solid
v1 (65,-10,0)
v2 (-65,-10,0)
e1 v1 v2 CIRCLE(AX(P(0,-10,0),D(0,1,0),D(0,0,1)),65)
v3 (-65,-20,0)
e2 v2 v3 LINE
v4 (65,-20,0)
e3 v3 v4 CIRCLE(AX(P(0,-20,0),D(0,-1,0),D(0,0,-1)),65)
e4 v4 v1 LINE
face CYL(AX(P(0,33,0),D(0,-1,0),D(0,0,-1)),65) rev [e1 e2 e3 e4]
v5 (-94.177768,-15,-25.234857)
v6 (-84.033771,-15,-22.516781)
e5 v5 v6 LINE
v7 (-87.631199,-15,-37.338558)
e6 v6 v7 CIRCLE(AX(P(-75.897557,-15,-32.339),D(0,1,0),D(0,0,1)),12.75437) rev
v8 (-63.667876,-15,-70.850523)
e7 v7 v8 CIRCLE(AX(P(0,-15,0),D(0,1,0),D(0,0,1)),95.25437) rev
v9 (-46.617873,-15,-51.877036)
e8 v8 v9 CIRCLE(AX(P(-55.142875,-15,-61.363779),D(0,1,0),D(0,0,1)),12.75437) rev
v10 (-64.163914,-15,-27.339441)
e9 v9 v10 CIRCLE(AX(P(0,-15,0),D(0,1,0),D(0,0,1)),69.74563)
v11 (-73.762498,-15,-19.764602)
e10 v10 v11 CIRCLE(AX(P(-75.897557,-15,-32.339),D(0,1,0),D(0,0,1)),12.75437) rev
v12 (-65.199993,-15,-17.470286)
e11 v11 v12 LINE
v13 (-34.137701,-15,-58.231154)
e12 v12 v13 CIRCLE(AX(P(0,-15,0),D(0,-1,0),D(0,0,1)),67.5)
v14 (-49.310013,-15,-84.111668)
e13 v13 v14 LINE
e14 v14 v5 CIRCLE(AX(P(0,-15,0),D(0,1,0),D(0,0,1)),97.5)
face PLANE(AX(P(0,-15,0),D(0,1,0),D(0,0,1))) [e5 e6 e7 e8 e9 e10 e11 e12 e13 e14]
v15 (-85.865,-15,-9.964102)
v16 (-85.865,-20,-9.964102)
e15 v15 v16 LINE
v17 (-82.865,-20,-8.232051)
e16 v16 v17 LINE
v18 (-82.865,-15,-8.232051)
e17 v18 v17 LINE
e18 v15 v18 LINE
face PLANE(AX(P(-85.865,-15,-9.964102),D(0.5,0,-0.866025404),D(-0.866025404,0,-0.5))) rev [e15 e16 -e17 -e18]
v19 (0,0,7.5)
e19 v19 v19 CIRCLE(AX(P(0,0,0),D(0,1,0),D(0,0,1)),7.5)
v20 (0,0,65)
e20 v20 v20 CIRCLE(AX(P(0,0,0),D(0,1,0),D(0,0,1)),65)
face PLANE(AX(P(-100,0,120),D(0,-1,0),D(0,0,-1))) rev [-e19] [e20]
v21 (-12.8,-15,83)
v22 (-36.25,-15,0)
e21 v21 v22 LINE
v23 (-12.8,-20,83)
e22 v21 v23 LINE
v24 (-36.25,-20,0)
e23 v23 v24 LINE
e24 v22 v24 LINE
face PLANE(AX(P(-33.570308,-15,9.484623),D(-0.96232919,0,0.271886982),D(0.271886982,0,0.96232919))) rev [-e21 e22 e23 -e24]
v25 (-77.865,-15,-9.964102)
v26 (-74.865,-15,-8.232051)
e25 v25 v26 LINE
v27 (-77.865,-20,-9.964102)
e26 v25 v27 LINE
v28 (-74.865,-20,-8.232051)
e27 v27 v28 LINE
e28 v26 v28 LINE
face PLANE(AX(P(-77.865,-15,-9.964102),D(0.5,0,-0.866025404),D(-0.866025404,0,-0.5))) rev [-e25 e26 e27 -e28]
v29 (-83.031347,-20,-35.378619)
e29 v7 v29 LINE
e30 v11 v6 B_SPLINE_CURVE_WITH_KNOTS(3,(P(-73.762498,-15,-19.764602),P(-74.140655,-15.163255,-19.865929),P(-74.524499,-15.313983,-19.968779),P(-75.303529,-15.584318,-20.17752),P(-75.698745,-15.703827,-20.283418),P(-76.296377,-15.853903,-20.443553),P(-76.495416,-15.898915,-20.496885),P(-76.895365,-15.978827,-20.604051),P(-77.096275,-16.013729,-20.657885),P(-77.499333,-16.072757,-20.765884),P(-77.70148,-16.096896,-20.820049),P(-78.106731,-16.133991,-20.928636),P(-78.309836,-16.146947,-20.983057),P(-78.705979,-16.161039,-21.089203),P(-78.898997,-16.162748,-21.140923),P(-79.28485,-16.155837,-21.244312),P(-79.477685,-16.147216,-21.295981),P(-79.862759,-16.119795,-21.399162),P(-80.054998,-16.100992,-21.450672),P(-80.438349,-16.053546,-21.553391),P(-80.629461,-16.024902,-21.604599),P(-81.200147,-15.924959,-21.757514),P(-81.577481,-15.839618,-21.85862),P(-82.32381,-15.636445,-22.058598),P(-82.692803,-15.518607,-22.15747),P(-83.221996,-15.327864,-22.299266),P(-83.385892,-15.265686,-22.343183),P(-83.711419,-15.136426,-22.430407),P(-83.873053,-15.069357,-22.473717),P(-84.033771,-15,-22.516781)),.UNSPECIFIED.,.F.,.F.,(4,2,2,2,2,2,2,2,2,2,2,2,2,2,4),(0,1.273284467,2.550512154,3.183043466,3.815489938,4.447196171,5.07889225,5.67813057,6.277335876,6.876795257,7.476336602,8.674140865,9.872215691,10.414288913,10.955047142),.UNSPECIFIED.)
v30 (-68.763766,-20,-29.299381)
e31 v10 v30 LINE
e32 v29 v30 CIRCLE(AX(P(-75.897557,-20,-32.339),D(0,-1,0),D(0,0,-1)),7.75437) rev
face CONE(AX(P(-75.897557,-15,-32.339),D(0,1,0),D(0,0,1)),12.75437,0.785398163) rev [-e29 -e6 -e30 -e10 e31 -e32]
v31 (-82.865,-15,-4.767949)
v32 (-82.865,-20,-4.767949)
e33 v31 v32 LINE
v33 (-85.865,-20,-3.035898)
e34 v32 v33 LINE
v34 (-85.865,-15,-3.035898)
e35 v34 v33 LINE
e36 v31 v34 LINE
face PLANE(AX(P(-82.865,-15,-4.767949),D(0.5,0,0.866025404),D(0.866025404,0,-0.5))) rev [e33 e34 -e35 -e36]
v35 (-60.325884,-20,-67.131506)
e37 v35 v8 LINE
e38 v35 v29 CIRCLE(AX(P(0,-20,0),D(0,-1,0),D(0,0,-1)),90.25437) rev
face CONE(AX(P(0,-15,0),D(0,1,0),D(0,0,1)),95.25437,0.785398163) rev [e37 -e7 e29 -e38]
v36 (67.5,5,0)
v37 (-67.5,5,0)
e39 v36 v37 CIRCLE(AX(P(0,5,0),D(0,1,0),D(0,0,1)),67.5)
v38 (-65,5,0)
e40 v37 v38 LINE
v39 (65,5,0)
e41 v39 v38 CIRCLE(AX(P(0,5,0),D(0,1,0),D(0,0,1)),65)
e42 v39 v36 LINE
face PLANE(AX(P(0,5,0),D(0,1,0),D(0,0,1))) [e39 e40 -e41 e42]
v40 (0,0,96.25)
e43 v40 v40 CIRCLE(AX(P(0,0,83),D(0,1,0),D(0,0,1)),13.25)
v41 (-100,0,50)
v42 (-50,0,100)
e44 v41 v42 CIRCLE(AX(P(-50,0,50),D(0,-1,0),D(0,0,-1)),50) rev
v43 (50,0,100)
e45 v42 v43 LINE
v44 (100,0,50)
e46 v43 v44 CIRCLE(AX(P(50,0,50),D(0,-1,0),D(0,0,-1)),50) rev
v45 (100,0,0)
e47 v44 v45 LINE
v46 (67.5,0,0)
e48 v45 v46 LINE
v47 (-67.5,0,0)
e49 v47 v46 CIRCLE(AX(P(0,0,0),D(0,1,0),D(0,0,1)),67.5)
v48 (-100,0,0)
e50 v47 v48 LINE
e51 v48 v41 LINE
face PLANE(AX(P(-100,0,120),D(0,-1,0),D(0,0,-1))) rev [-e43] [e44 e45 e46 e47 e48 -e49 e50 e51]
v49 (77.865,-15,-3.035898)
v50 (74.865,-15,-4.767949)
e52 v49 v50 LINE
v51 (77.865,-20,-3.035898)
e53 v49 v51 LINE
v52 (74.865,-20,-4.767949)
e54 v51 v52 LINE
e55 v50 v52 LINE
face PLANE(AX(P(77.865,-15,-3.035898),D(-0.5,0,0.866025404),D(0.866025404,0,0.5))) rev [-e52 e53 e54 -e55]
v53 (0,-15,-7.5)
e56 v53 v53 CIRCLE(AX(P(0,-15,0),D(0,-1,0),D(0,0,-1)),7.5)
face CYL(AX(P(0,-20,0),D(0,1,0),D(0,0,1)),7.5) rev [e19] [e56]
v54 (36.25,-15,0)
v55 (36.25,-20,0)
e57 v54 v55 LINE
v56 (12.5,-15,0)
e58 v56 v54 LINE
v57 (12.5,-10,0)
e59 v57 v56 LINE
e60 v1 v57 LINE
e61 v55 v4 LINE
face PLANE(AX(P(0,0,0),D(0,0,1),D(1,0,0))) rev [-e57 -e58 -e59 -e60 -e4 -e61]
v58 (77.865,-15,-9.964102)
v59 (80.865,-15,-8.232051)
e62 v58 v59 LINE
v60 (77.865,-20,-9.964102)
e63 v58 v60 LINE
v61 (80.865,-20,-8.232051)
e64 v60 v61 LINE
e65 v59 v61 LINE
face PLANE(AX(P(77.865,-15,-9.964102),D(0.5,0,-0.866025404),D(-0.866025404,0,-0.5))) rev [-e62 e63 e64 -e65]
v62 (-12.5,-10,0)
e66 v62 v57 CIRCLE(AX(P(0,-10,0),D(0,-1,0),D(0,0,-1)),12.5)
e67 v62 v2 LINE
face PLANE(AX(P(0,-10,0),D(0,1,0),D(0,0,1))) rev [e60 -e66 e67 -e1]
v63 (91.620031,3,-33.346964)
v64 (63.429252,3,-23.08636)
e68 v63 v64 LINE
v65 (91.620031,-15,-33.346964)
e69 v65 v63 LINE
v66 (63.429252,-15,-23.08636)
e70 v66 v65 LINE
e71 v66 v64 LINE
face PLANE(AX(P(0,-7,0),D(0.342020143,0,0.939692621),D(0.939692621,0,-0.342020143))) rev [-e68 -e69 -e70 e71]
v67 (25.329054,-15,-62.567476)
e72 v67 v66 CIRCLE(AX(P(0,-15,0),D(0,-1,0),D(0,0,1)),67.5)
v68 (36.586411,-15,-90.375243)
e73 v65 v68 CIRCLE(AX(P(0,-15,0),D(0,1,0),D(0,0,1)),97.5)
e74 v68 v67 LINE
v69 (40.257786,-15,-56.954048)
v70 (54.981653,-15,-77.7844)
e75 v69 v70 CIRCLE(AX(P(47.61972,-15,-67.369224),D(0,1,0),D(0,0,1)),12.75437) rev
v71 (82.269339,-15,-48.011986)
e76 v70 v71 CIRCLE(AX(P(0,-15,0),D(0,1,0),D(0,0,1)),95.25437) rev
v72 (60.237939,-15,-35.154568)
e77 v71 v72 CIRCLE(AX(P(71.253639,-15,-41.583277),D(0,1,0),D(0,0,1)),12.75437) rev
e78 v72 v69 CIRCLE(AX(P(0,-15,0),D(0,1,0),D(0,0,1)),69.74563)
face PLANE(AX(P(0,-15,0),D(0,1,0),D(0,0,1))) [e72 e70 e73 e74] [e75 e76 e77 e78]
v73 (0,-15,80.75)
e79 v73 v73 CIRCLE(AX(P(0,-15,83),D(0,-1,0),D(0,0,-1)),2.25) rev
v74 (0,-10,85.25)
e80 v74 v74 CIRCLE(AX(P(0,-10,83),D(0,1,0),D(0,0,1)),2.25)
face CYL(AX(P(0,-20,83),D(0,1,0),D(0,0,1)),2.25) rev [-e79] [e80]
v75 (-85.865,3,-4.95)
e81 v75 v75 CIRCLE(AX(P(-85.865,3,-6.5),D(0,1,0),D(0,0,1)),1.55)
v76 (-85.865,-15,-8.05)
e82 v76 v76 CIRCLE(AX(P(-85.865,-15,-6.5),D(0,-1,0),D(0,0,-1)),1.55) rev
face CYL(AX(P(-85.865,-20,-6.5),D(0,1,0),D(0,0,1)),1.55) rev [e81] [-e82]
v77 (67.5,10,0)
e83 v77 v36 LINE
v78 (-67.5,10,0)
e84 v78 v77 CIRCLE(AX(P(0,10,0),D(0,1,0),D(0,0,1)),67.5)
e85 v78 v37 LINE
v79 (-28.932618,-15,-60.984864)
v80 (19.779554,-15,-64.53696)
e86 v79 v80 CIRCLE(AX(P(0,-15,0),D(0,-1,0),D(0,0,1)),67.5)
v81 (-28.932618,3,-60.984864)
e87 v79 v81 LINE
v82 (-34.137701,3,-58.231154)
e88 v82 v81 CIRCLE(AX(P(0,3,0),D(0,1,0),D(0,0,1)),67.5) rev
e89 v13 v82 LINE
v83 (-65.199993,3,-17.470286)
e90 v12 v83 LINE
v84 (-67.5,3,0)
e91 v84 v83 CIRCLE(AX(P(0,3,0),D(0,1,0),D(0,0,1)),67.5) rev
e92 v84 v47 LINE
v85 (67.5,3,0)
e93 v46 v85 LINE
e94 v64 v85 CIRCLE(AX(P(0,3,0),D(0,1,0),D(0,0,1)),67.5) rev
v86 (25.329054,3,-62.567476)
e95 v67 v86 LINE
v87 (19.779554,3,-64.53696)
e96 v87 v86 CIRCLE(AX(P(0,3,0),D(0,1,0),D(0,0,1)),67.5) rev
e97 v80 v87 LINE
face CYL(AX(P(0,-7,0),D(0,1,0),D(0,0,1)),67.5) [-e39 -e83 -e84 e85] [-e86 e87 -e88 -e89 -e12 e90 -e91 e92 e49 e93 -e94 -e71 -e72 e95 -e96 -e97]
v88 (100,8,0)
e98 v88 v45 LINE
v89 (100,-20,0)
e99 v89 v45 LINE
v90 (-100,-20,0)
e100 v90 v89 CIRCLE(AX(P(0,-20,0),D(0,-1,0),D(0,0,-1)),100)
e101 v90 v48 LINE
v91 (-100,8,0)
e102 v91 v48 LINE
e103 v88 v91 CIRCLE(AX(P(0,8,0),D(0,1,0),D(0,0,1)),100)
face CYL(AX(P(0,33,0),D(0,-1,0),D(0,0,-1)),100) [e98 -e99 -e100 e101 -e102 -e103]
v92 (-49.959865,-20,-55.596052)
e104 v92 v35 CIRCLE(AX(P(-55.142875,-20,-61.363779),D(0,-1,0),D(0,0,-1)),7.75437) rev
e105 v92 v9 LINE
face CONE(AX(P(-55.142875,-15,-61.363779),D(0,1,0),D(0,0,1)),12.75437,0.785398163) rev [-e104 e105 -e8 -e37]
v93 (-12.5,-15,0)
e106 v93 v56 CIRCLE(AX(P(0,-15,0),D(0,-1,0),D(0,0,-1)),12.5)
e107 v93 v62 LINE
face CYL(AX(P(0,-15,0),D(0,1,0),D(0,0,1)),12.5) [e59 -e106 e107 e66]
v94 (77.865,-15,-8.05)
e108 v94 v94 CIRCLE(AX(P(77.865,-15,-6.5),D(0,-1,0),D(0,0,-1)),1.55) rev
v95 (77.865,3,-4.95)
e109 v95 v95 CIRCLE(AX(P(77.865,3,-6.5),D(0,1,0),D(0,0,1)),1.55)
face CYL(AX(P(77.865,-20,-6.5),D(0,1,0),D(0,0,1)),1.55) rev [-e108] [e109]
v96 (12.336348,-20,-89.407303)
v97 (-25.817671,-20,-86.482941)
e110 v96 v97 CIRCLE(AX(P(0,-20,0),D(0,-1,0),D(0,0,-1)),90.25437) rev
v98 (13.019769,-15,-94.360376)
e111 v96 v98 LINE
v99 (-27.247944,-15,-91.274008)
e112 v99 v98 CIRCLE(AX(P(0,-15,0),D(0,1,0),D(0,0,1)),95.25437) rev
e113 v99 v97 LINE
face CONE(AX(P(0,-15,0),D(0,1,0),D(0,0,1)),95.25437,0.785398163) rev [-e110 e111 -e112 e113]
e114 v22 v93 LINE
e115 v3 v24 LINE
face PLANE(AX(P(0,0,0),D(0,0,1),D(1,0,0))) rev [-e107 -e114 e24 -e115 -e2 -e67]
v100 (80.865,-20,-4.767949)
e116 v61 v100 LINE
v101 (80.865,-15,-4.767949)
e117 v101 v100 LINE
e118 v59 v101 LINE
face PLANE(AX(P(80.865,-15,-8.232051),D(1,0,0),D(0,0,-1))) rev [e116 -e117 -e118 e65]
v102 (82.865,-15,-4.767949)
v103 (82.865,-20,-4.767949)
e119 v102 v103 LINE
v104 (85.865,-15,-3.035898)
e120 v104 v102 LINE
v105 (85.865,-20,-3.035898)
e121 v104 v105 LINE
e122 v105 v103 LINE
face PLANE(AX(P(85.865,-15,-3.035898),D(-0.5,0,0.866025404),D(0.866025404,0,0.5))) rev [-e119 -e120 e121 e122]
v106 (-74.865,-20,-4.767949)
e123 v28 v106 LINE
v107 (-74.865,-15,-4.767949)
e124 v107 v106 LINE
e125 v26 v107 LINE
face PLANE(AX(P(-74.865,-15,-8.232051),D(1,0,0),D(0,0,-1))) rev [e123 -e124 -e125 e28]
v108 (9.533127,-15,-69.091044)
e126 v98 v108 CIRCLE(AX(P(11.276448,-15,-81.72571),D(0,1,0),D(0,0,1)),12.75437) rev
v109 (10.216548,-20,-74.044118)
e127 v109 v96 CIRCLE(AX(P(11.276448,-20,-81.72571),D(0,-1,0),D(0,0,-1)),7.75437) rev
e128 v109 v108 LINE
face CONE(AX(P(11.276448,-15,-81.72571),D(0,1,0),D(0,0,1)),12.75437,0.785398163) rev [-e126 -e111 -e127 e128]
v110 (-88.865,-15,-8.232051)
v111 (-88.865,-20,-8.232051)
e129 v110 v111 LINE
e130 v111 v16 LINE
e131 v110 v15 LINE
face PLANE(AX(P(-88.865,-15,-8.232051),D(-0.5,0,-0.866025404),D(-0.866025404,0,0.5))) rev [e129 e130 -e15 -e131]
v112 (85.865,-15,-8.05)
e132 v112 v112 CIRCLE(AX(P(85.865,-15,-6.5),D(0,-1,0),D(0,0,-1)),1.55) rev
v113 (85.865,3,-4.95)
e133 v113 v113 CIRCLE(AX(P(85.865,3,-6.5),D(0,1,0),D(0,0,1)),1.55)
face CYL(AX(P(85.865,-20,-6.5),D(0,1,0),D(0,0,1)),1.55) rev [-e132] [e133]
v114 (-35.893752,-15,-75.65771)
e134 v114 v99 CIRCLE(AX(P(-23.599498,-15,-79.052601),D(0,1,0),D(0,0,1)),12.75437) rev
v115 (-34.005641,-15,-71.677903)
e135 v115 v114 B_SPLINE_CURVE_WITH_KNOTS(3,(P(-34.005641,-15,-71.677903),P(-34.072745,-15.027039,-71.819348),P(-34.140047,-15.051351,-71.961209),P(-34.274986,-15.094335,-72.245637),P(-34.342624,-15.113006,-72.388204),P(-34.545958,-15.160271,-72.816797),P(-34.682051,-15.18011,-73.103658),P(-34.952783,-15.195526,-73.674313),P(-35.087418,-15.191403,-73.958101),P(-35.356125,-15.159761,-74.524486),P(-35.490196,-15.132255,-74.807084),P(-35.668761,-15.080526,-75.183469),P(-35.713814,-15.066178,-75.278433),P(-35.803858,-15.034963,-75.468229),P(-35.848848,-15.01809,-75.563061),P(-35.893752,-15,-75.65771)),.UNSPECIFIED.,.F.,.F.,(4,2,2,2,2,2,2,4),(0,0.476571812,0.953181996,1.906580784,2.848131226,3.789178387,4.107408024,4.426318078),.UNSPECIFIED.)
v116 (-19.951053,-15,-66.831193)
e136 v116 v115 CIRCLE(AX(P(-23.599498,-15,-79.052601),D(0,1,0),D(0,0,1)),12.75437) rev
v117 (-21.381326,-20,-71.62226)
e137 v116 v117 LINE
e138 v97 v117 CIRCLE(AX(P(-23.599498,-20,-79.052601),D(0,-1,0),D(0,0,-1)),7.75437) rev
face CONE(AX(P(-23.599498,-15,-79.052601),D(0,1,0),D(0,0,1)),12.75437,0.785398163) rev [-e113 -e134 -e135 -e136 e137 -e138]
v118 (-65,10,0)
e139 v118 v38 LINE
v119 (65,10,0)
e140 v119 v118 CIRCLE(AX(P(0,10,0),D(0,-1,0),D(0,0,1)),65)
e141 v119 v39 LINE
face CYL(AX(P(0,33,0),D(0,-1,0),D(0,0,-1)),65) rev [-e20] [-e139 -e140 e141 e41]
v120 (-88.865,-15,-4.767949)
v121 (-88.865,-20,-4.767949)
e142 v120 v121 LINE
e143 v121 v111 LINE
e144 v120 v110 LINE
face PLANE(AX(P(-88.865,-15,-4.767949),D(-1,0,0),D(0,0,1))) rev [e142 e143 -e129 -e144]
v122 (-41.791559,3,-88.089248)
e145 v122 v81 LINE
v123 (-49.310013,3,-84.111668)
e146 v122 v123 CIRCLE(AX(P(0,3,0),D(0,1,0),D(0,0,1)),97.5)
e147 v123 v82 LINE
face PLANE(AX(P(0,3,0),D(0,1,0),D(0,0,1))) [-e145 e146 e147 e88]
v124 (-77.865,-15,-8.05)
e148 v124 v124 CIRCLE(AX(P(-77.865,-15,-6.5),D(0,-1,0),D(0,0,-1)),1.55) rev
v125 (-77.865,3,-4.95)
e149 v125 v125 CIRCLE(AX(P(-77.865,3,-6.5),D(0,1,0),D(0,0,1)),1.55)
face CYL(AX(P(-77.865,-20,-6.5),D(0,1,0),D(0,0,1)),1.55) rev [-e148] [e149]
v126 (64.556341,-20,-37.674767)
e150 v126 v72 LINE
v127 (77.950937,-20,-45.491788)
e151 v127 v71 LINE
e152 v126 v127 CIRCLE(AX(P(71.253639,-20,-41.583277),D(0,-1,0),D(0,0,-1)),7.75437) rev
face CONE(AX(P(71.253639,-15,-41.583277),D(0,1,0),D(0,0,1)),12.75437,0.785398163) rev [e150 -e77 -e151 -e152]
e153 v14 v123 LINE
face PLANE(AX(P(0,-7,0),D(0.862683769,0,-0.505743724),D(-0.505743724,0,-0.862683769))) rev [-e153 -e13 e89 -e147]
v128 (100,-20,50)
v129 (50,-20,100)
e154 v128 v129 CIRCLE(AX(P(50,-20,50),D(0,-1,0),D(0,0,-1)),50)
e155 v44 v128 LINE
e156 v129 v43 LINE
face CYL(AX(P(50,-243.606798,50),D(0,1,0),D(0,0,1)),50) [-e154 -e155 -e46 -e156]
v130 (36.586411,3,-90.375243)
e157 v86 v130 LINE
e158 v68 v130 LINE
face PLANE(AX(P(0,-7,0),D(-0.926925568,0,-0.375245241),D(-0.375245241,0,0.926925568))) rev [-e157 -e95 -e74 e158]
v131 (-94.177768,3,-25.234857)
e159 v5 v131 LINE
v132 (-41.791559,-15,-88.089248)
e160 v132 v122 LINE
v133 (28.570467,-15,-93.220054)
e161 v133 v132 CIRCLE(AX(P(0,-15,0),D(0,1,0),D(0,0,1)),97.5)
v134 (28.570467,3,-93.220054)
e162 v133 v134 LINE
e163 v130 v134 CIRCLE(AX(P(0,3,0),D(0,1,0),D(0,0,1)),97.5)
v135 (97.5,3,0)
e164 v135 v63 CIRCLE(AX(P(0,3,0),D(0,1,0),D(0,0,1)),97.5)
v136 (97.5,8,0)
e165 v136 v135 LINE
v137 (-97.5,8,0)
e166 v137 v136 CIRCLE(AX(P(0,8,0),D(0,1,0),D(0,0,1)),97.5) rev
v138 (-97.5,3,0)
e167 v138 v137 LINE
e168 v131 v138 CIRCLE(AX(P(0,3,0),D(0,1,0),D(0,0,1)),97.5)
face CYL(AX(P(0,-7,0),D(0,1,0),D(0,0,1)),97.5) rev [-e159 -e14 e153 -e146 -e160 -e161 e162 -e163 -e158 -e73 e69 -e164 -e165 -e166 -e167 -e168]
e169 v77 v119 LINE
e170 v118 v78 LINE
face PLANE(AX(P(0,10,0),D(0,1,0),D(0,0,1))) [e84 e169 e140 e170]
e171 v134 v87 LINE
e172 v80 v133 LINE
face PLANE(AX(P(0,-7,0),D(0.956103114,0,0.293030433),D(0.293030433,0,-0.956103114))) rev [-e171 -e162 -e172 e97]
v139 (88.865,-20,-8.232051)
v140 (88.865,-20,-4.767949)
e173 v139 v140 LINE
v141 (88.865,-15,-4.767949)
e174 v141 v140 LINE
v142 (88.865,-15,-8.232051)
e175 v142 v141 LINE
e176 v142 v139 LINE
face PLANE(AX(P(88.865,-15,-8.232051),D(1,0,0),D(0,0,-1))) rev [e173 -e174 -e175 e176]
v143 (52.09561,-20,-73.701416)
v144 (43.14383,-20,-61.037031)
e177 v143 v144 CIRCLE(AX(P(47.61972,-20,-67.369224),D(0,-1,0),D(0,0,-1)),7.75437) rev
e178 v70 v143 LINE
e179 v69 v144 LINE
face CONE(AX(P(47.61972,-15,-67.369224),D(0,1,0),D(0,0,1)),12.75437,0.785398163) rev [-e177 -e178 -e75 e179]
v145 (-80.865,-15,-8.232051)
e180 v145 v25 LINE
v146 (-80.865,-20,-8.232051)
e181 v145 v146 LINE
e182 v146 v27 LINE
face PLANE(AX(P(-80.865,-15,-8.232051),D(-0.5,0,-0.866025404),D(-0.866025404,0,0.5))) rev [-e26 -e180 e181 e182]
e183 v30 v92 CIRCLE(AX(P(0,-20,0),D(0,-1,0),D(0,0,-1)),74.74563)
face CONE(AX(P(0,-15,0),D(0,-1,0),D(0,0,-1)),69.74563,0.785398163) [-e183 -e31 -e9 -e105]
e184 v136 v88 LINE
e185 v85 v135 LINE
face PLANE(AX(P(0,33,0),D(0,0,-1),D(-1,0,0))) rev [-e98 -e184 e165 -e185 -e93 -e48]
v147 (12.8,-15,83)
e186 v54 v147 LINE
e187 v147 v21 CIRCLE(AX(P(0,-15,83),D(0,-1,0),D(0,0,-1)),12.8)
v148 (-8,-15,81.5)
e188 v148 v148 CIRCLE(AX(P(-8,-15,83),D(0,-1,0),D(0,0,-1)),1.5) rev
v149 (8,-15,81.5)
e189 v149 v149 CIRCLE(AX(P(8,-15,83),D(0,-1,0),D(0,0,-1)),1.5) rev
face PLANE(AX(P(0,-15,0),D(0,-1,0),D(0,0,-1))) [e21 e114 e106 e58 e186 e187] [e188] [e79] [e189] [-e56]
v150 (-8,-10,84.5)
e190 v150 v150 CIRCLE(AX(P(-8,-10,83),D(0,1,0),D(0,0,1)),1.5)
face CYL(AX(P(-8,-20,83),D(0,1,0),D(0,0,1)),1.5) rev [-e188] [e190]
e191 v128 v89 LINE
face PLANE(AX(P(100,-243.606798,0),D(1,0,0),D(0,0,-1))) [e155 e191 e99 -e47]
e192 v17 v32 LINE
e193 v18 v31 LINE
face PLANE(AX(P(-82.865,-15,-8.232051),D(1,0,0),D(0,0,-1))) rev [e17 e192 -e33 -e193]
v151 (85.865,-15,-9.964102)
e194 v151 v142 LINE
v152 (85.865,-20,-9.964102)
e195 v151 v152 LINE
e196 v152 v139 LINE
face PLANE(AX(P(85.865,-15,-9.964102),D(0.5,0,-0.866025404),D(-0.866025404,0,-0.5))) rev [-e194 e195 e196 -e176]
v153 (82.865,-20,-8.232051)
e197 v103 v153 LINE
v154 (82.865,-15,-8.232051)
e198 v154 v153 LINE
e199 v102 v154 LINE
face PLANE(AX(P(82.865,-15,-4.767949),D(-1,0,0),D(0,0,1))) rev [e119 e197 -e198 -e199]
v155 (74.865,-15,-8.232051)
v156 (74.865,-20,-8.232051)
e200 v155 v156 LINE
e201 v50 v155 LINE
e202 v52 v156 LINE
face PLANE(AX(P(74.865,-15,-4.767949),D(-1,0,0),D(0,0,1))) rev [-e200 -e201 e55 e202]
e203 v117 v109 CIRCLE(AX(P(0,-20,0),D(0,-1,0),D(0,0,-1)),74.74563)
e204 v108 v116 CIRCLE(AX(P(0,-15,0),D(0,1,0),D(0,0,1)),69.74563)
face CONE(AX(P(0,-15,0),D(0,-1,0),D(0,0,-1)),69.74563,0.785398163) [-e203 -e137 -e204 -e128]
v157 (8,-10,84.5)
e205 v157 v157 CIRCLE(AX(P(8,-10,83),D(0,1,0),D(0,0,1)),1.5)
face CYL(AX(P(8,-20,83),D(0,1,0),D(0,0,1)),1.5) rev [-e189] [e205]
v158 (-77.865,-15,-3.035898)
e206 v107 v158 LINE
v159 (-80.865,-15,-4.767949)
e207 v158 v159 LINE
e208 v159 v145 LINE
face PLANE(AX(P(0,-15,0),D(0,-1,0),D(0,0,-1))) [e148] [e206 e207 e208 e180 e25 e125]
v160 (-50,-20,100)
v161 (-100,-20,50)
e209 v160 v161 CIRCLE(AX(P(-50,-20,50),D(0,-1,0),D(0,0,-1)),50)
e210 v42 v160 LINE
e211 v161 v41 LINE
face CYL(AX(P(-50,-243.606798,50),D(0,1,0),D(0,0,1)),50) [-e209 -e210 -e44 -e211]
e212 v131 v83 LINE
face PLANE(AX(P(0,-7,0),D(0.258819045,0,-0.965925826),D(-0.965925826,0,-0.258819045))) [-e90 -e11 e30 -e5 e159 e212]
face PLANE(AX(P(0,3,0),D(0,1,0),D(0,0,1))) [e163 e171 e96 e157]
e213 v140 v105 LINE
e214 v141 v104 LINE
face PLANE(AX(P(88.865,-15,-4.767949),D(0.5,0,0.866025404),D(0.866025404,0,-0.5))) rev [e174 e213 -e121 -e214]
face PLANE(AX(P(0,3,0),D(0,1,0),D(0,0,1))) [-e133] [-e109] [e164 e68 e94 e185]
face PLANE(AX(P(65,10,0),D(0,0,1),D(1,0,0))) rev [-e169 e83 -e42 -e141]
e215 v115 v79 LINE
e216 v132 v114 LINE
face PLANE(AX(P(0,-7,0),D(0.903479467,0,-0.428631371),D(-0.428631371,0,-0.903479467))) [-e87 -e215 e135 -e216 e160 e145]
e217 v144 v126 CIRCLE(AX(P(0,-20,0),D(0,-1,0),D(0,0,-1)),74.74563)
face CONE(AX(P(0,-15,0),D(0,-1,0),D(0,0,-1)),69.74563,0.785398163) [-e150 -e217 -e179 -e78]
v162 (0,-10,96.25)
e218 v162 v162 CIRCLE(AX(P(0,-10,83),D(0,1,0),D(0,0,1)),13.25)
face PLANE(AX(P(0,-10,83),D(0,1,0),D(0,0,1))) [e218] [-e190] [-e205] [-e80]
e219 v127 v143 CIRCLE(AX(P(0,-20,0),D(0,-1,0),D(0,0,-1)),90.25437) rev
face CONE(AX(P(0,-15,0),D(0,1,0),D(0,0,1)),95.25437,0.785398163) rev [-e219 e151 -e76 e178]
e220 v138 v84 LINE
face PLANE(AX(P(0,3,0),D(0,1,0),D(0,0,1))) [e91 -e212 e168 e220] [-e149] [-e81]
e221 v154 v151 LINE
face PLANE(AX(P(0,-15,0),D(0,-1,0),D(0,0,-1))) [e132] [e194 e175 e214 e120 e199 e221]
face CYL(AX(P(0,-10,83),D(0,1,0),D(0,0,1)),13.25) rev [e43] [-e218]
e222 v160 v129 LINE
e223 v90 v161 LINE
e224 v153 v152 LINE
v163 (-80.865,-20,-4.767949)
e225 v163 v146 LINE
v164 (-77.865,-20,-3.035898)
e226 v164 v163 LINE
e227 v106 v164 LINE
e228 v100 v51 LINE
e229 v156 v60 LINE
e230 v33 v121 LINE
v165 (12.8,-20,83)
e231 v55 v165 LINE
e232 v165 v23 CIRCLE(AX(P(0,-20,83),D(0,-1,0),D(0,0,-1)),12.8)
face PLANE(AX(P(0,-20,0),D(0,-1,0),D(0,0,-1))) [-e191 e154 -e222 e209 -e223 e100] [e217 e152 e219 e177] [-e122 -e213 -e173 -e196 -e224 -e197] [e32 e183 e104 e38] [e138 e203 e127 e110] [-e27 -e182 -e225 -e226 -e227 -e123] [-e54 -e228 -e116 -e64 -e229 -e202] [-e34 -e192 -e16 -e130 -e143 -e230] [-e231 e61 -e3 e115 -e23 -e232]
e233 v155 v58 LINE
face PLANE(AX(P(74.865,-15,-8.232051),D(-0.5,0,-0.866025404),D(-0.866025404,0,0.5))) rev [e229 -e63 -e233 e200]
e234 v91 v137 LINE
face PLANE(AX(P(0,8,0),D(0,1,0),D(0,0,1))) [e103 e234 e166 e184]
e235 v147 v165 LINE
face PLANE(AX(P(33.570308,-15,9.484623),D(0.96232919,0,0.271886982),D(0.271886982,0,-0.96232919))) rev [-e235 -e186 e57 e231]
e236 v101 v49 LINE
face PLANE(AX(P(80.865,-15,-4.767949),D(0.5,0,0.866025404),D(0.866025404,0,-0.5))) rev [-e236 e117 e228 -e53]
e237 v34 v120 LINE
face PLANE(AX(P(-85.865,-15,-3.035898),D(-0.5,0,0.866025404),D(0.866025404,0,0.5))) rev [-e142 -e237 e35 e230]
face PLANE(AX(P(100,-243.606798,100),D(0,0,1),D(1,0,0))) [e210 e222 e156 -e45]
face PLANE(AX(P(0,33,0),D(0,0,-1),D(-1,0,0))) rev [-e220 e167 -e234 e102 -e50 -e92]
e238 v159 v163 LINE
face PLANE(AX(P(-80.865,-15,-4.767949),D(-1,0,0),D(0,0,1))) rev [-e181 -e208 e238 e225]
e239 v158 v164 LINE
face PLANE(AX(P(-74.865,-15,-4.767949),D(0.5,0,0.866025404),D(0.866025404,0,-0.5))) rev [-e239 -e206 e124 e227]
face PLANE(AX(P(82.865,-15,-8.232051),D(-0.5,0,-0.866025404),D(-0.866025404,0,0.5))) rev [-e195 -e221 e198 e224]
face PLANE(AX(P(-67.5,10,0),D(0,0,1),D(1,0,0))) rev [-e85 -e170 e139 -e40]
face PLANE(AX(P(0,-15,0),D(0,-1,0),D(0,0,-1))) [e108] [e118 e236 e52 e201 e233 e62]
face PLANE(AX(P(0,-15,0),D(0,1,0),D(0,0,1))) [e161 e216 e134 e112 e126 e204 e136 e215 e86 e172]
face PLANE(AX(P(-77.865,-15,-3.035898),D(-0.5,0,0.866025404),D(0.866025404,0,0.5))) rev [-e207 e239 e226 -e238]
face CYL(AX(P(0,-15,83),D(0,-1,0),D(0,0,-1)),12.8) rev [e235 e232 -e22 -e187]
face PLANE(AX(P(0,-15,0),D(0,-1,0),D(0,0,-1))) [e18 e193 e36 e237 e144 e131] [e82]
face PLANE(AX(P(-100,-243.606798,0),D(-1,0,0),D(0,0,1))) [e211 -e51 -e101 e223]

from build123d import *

# Parameters (mm, degrees)
BOSS_EXTRUDE1_DEPTH        = 33
CUT_EXTRUDE1_DEPTH         = 40
CUT_EXTRUDE2_DEPTH         = 40
CUT_EXTRUDE3_DEPTH         = 40
BOSS_EXTRUDE3_START        = 30
BOSS_EXTRUDE3_DEPTH        = 30
SKETCH26_W                 = 200
SKETCH26_H                 = 30
BOSS_EXTRUDE6_DEPTH        = 120
SKETCH28_R                 = 156.204993518
CUT_EXTRUDE4_DEPTH         = 40
CUT_EXTRUDE5_START         = -25
SKETCH29_R                 = 100
CUT_EXTRUDE5_DEPTH         = 25
CUT_EXTRUDE8_DEPTH         = 20
SKETCH31_R                 = 156.204993518
SKETCH31_R_2               = 100
CUT_EXTRUDE9_DEPTH         = 20
CUT_EXTRUDE10_DEPTH        = 20
BOSS_EXTRUDE8_START        = -10
SKETCH33_R                 = 65
BOSS_EXTRUDE8_DEPTH        = 10
CUT_EXTRUDE11_DEPTH        = 15
CHAMFER2_SIZE              = 7
SKETCH35_R                 = 7.5
CUT_EXTRUDE12_DEPTH        = 143.828568571
SKETCH36_R                 = 12.5
SKETCH36_R_2               = 7.5
BOSS_EXTRUDE9_DEPTH        = 5
SKETCH37_W                 = 200
SKETCH37_H                 = 100
BOSS_EXTRUDE10_DEPTH       = 20
SKETCH38_R                 = 7.5
CUT_EXTRUDE13_DEPTH        = 15
FILLET1_R                  = 50
SKETCH40_R                 = 97.5
CUT_EXTRUDE14_DEPTH        = 5
BOSS_EXTRUDE11_OUTLINE_R   = 67.5
BOSS_EXTRUDE11_OUTLINE_R_2 = 65
BOSS_EXTRUDE11_DEPTH       = 5
BOSS_EXTRUDE12_DEPTH       = 10
CUT_EXTRUDE15_DEPTH        = 143.828568571
CUT_EXTRUDE15_DEPTH_BACK   = 143.828568571
SKETCH48_R                 = 1.55
SKETCH50_R                 = 13.25
CUT_EXTRUDE16_DEPTH        = 10
CUT_EXTRUDE17_DEPTH        = 143.828568571
CUT_EXTRUDE17_DEPTH_BACK   = 143.828568571
SKETCH51_R                 = 2.25
SKETCH51_R_2               = 1.5
SKETCH52_R                 = 12.8
CUT_EXTRUDE18_DEPTH        = 5
CUT_EXTRUDE19_DEPTH        = 5
CUT_EXTRUDE20_DEPTH        = 5


# Read off the part's stored shape, not the designer's step: Boss-Extrude11
with BuildPart() as part:
    # Sketch1 → Boss-Extrude1 (new body)
    with BuildSketch(Plane(origin=(0, 0, 0), x_dir=(1, 0, 0), z_dir=(0, 1, 0))):
        with BuildLine():
            ThreePointArc((100, 0), (0, 100), (-100, 0))
            Line((-100, 0), (-65, 0))
            ThreePointArc((-65, 0), (0, 65), (65, 0))
            Line((65, 0), (100, 0))
        make_face()
    extrude(amount=BOSS_EXTRUDE1_DEPTH)

    # Sketch3 → Cut-Extrude1 (cut)
    with BuildSketch(Plane(origin=(0, 33, 0), x_dir=(1, 0, 0), z_dir=(0, 1, 0))):
        with BuildLine():
            ThreePointArc((91.620030527, 33.346963974), (70.158955681, 67.705028895), (36.586411012, 90.3752429))
            Line((36.586411012, 90.3752429), (25.329053777, 62.567475854))
            ThreePointArc((25.329053777, 62.567475854), (48.571584702, 46.872712312), (63.429251903, 23.086359674))
            Line((63.429251903, 23.086359674), (91.620030527, 33.346963974))
        make_face()
    extrude(amount=-CUT_EXTRUDE1_DEPTH, mode=Mode.SUBTRACT)

    # Sketch4 → Cut-Extrude2 (cut)
    with BuildSketch(Plane(origin=(0, 33, 0), x_dir=(1, 0, 0), z_dir=(0, 1, 0))):
        with BuildLine():
            Line((-41.791558708, 88.089248043), (-28.932617567, 60.98486403))
            ThreePointArc((-28.932617567, 60.98486403), (-4.909072096, 67.321252299), (19.779554251, 64.536960214))
            Line((19.779554251, 64.536960214), (28.570467251, 93.220053642))
            ThreePointArc((28.570467251, 93.220053642), (-7.090881917, 97.241808877), (-41.791558708, 88.089248043))
        make_face()
    extrude(amount=-CUT_EXTRUDE2_DEPTH, mode=Mode.SUBTRACT)

    # Sketch5 → Cut-Extrude3 (cut)
    with BuildSketch(Plane(origin=(0, 33, 0), x_dir=(1, 0, 0), z_dir=(0, 1, 0))):
        with BuildLine():
            ThreePointArc((-65.199993275, 17.470285544), (-53.687582374, 40.913243562), (-34.137701343, 58.231154436))
            Line((-34.137701343, 58.231154436), (-49.310013051, 84.111667519))
            ThreePointArc((-49.310013051, 84.111667519), (-77.548730096, 59.096907368), (-94.177768063, 25.234856897))
            Line((-94.177768063, 25.234856897), (-65.199993275, 17.470285544))
        make_face()
    extrude(amount=-CUT_EXTRUDE3_DEPTH, mode=Mode.SUBTRACT)

    # Sketch8 → Boss-Extrude3 (add)
    with BuildSketch(Plane.XZ.offset(BOSS_EXTRUDE3_START)):
        with BuildLine():
            Line((-65, 0), (-100, 0))
            ThreePointArc((-100, 0), (0, -100), (100, 0))
            Line((100, 0), (65, 0))
            ThreePointArc((65, 0), (0, -65), (-65, 0))
        make_face()
    extrude(amount=-BOSS_EXTRUDE3_DEPTH)

    # Sketch26 → Boss-Extrude6 (add)
    with BuildSketch(Plane.XY):
        with Locations((0, -15)):
            Rectangle(SKETCH26_W, SKETCH26_H)
    extrude(amount=BOSS_EXTRUDE6_DEPTH)

    # Sketch28 → Cut-Extrude4 (cut)
    with BuildSketch(Plane.XZ.offset(60)):
        Circle(SKETCH28_R)
    extrude(amount=-CUT_EXTRUDE4_DEPTH, mode=Mode.SUBTRACT)

    # Sketch29 → Cut-Extrude5 (cut)
    with BuildSketch(Plane(origin=(0, 33, 0), x_dir=(1, 0, 0), z_dir=(0, 1, 0)).offset(CUT_EXTRUDE5_START)):
        Circle(SKETCH29_R)
    extrude(amount=CUT_EXTRUDE5_DEPTH, mode=Mode.SUBTRACT)

    # Sketch30 → Cut-Extrude8 (cut)
    with BuildSketch(Plane.XZ.offset(20)):
        with BuildLine():
            ThreePointArc((-99.143723606, 13.058409912), (6.543227008, 99.785701282), (100, 0))
            Line((100, 0), (100, 120))
            Line((100, 120), (-100, 120))
            Line((-100, 120), (-99.143723606, 13.058409912))
        make_face()
    extrude(amount=-CUT_EXTRUDE8_DEPTH, mode=Mode.SUBTRACT)

    # Sketch31 → Cut-Extrude9 (cut)
    with BuildSketch(Plane(origin=(0, -20, 0), x_dir=(-1, 0, 0), z_dir=(0, -1, 0))):
        Circle(SKETCH31_R)
        with Locations(Location((0, 0, 0), (0, 0, 90))):
            Circle(SKETCH31_R_2, mode=Mode.SUBTRACT)
    extrude(amount=-CUT_EXTRUDE9_DEPTH, mode=Mode.SUBTRACT)

    # Sketch32 → Cut-Extrude10 (cut)
    with BuildSketch(Plane(origin=(0, 0, 0), x_dir=(1, 0, 0), z_dir=(0, 1, 0))):
        with BuildLine():
            ThreePointArc((66.28370188, 38.682846188), (74.154069941, 36.613340263), (76.223575866, 44.483708324))
            ThreePointArc((76.223575866, 44.483708324), (65.061093766, 59.631266145), (50.941192214, 72.068222955))
            ThreePointArc((50.941192214, 72.068222955), (42.920720385, 70.690696246), (44.298247095, 62.670224417))
            ThreePointArc((44.298247095, 62.670224417), (56.576854263, 51.855098937), (66.28370188, 38.682846188))
        make_face()
        with BuildLine():
            ThreePointArc((10.489916637, 76.025346912), (16.976811553, 80.939178669), (12.062979796, 87.426073585))
            ThreePointArc((12.062979796, 87.426073585), (-6.744582107, 87.996275127), (-25.24556204, 84.566514776))
            ThreePointArc((-25.24556204, 84.566514776), (-29.113412559, 77.406537084), (-21.953434866, 73.538686565))
            ThreePointArc((-21.953434866, 73.538686565), (-5.865060312, 76.521191781), (10.489916637, 76.025346912))
        make_face()
        with BuildLine():
            ThreePointArc((-51.296662451, 57.083659181), (-50.862754743, 65.209991213), (-58.989086775, 65.643898921))
            ThreePointArc((-58.989086775, 65.643898921), (-71.788973817, 51.333975711), (-81.19140666, 34.594642774))
            ThreePointArc((-81.19140666, 34.594642774), (-78.153199938, 27.045149539), (-70.603706703, 30.083356261))
            ThreePointArc((-70.603706703, 30.083356261), (-62.427390538, 44.639809976), (-51.296662451, 57.083659181))
        make_face()
    extrude(amount=-CUT_EXTRUDE10_DEPTH, mode=Mode.SUBTRACT)

    # Sketch33 → Boss-Extrude8 (add)
    with BuildSketch(Plane(origin=(0, 0, 0), x_dir=(1, 0, 0), z_dir=(0, 1, 0)).offset(BOSS_EXTRUDE8_START)):
        Circle(SKETCH33_R)
    extrude(amount=BOSS_EXTRUDE8_DEPTH)

    # Sketch34 → Cut-Extrude11 (cut)
    with BuildSketch(Plane(origin=(0, 0, 0), x_dir=(1, 0, 0), z_dir=(0, 1, 0))):
        with BuildLine():
            Line((63.429251903, 23.086359674), (91.620030527, 33.346963974))
            ThreePointArc((91.620030527, 33.346963974), (70.158955681, 67.705028895), (36.586411012, 90.3752429))
            Line((36.586411012, 90.3752429), (25.329053777, 62.567475854))
            ThreePointArc((25.329053777, 62.567475854), (48.571584702, 46.872712312), (63.429251903, 23.086359674))
        make_face()
        with BuildLine():
            Line((19.779554251, 64.536960214), (28.570467251, 93.220053642))
            ThreePointArc((28.570467251, 93.220053642), (-7.090881917, 97.241808877), (-41.791558708, 88.089248043))
            Line((-41.791558708, 88.089248043), (-28.932617567, 60.98486403))
            ThreePointArc((-28.932617567, 60.98486403), (-4.909072096, 67.321252299), (19.779554251, 64.536960214))
        make_face()
        with BuildLine():
            Line((-34.137701343, 58.231154436), (-49.310013051, 84.111667519))
            ThreePointArc((-49.310013051, 84.111667519), (-77.548730096, 59.096907368), (-94.177768063, 25.234856897))
            Line((-94.177768063, 25.234856897), (-65.199993275, 17.470285544))
            ThreePointArc((-65.199993275, 17.470285544), (-53.687582374, 40.913243562), (-34.137701343, 58.231154436))
        make_face()
    extrude(amount=-CUT_EXTRUDE11_DEPTH, mode=Mode.SUBTRACT)

    # Chamfer2
    # the kernel refuses this chamfer: 7 mm, written as the material it takes off along each edge
    with BuildSketch(Plane(origin=(0, -15, 0), x_dir=(-0.6683984801552533, 0, -0.7438033824379582), z_dir=(0.7438033824379582, 0, -0.6683984801552533))) as chamfer2_piece_1:
        Polygon((88.25437, -CHAMFER2_SIZE), (88.25437 + CHAMFER2_SIZE, 0), (88.25437, 0), align=None)
    revolve(axis=Axis((0, -15, 0), (0, 1, 0)), revolution_arc=24.978173914, mode=Mode.SUBTRACT)
    with BuildSketch(Plane(origin=(-55.142874613, -15, -61.363779051), x_dir=(0.668398480155252, 0, 0.7438033824379592), z_dir=(-0.7438033824379592, 0, 0.668398480155252))) as chamfer2_piece_2:
        Polygon((5.75437, -CHAMFER2_SIZE), (5.75437 + CHAMFER2_SIZE, 0), (5.75437, 0), align=None)
    revolve(axis=Axis((-55.142874613, -15, -61.363779051), (0, 1, 0)), revolution_arc=180, mode=Mode.SUBTRACT)
    with BuildSketch(Plane(origin=(-75.897556681, -15, -32.338999517), x_dir=(-0.919970384017718, 0, -0.3919878729377892), z_dir=(0.3919878729377892, 0, -0.919970384017718))) as chamfer2_piece_3_section:
        Polygon((5.75437, -CHAMFER2_SIZE), (5.75437 + CHAMFER2_SIZE, 0), (5.75437, 0), align=None)
    chamfer2_piece_3 = revolve(axis=Axis((-75.897556681, -15, -32.338999517), (0, 1, 0)), revolution_arc=180, mode=Mode.PRIVATE)
    chamfer2_piece_3 = split(chamfer2_piece_3, bisect_by=Plane(origin=(-80.145870911, -18.437935535, -21.475021387), z_dir=(0.2588190451025148, 0, -0.9659258262890699)), keep=Keep.TOP, mode=Mode.PRIVATE)
    add(chamfer2_piece_3, mode=Mode.SUBTRACT)
    with BuildSketch(Plane(origin=(0, -15, 0), x_dir=(-0.6683984801552512, 0, -0.7438033824379602), z_dir=(0.7438033824379602, 0, -0.6683984801552512))) as chamfer2_piece_4:
        Polygon((76.74563, -CHAMFER2_SIZE), (76.74563 - CHAMFER2_SIZE, 0), (76.74563, 0), align=None)
    revolve(axis=Axis((0, -15, 0), (0, 1, 0)), revolution_arc=24.978173914, mode=Mode.SUBTRACT)
    with BuildSketch(Plane(origin=(0, -15, 0), x_dir=(0.1366842208067535, 0, -0.9906146696786046), z_dir=(0.9906146696786046, 0, 0.1366842208067535))) as chamfer2_piece_5:
        Polygon((88.25437, -CHAMFER2_SIZE), (88.25437 + CHAMFER2_SIZE, 0), (88.25437, 0), align=None)
    revolve(axis=Axis((0, -15, 0), (0, 1, 0)), revolution_arc=24.477914532, mode=Mode.SUBTRACT)
    with BuildSketch(Plane(origin=(11.276448217, -15, -81.725710248), x_dir=(-0.13668422080675505, 0, 0.9906146696786042), z_dir=(-0.9906146696786042, 0, -0.13668422080675505))) as chamfer2_piece_6:
        Polygon((5.75437, -CHAMFER2_SIZE), (5.75437 + CHAMFER2_SIZE, 0), (5.75437, 0), align=None)
    revolve(axis=Axis((11.276448217, -15, -81.725710248), (0, 1, 0)), revolution_arc=180, mode=Mode.SUBTRACT)
    with BuildSketch(Plane(origin=(-23.599498453, -15, -79.052600671), x_dir=(-0.2860545267014413, 0, -0.9582133414608746), z_dir=(0.9582133414608746, 0, -0.2860545267014413))) as chamfer2_piece_7_section:
        Polygon((5.75437, -CHAMFER2_SIZE), (5.75437 + CHAMFER2_SIZE, 0), (5.75437, 0), align=None)
    chamfer2_piece_7 = revolve(axis=Axis((-23.599498453, -15, -79.052600671), (0, 1, 0)), revolution_arc=180, mode=Mode.PRIVATE)
    chamfer2_piece_7 = split(chamfer2_piece_7, bisect_by=Plane(origin=(-35.54966771, -18.437744319, -74.93244075), z_dir=(0.9034794671049792, 0, -0.428631371366706)), keep=Keep.TOP, mode=Mode.PRIVATE)
    add(chamfer2_piece_7, mode=Mode.SUBTRACT)
    with BuildSketch(Plane(origin=(0, -15, 0), x_dir=(0.13668422080675355, 0, -0.9906146696786046), z_dir=(0.9906146696786046, 0, 0.13668422080675355))) as chamfer2_piece_8:
        Polygon((76.74563, -CHAMFER2_SIZE), (76.74563 - CHAMFER2_SIZE, 0), (76.74563, 0), align=None)
    revolve(axis=Axis((0, -15, 0), (0, 1, 0)), revolution_arc=24.477914532, mode=Mode.SUBTRACT)
    with BuildSketch(Plane(origin=(0, -15, 0), x_dir=(0.8636804711885281, 0, -0.5040397243150209), z_dir=(0.5040397243150209, 0, 0.8636804711885281))) as chamfer2_piece_9:
        Polygon((88.25437, -CHAMFER2_SIZE), (88.25437 + CHAMFER2_SIZE, 0), (88.25437, 0), align=None)
    revolve(axis=Axis((0, -15, 0), (0, 1, 0)), revolution_arc=24.477914532, mode=Mode.SUBTRACT)
    with BuildSketch(Plane(origin=(71.253638873, -15, -41.583277256), x_dir=(-0.8636804711885285, 0, 0.5040397243150201), z_dir=(-0.5040397243150201, 0, -0.8636804711885285))) as chamfer2_piece_10:
        Polygon((5.75437, -CHAMFER2_SIZE), (5.75437 + CHAMFER2_SIZE, 0), (5.75437, 0), align=None)
    revolve(axis=Axis((71.253638873, -15, -41.583277256), (0, 1, 0)), revolution_arc=180, mode=Mode.SUBTRACT)
    with BuildSketch(Plane(origin=(47.619719655, -15, -67.369223686), x_dir=(0.577208723085647, 0, -0.8165966507363577), z_dir=(0.8165966507363577, 0, 0.577208723085647))) as chamfer2_piece_11:
        Polygon((5.75437, -CHAMFER2_SIZE), (5.75437 + CHAMFER2_SIZE, 0), (5.75437, 0), align=None)
    revolve(axis=Axis((47.619719655, -15, -67.369223686), (0, 1, 0)), revolution_arc=180, mode=Mode.SUBTRACT)
    with BuildSketch(Plane(origin=(0, -15, 0), x_dir=(0.8636804711885259, 0, -0.5040397243150245), z_dir=(0.5040397243150245, 0, 0.8636804711885259))) as chamfer2_piece_12:
        Polygon((76.74563, -CHAMFER2_SIZE), (76.74563 - CHAMFER2_SIZE, 0), (76.74563, 0), align=None)
    revolve(axis=Axis((0, -15, 0), (0, 1, 0)), revolution_arc=24.477914532, mode=Mode.SUBTRACT)

    # Sketch35 → Cut-Extrude12 (cut, through all)
    with BuildSketch(Plane(origin=(0, 0, 0), x_dir=(1, 0, 0), z_dir=(0, 1, 0))):
        with Locations(Location((0, 0, 0), (0, 0, 270))):
            Circle(SKETCH35_R)
    extrude(amount=-CUT_EXTRUDE12_DEPTH, mode=Mode.SUBTRACT)

    # Sketch36 → Boss-Extrude9 (add)
    with BuildSketch(Plane(origin=(0, -10, 0), x_dir=(-1, 0, 0), z_dir=(0, -1, 0))):
        Circle(SKETCH36_R)
        with Locations(Location((0, 0, 0), (0, 0, 270))):
            Circle(SKETCH36_R_2, mode=Mode.SUBTRACT)
    extrude(amount=BOSS_EXTRUDE9_DEPTH)

    # Sketch37 → Boss-Extrude10 (add)
    with BuildSketch(Plane(origin=(0, 0, 0), x_dir=(1, 0, 0), z_dir=(0, 1, 0))):
        with Locations((0, -50)):
            Rectangle(SKETCH37_W, SKETCH37_H)
    extrude(amount=-BOSS_EXTRUDE10_DEPTH)

    # Sketch38 → Cut-Extrude13 (cut)
    with BuildSketch(Plane(origin=(0, 0, 0), x_dir=(1, 0, 0), z_dir=(0, 1, 0))):
        with Locations(Location((0, 0, 0), (0, 0, 270))):
            Circle(SKETCH38_R)
    extrude(amount=-CUT_EXTRUDE13_DEPTH, mode=Mode.SUBTRACT)

    # Fillet1
    fillet1_edges = [part.edges().sort_by_distance(p)[0] for p in [
        (-100, -10, 100),
        (100, -10, 100),
    ]]
    fillet(fillet1_edges, radius=FILLET1_R)

    # Sketch40 → Cut-Extrude14 (cut)
    with BuildSketch(Plane(origin=(0, 8, 0), x_dir=(1, 0, 0), z_dir=(0, 1, 0))):
        Circle(SKETCH40_R)
    extrude(amount=-CUT_EXTRUDE14_DEPTH, mode=Mode.SUBTRACT)

    # Boss-Extrude11 outline → Boss-Extrude11 (add)
    with BuildSketch(Plane(origin=(0, 0, 0), x_dir=(1, 0, 0), z_dir=(0, 1, 0))):
        Circle(BOSS_EXTRUDE11_OUTLINE_R)
        Circle(BOSS_EXTRUDE11_OUTLINE_R_2, mode=Mode.SUBTRACT)
    extrude(amount=BOSS_EXTRUDE11_DEPTH)

    # Sketch44 → Boss-Extrude12 (add)
    with BuildSketch(Plane(origin=(0, 0, 0), x_dir=(1, 0, 0), z_dir=(0, 1, 0))):
        with BuildLine():
            Line((-67.5, 0), (-65, 0))
            ThreePointArc((-65, 0), (0, -65), (65, 0))
            Line((65, 0), (67.5, 0))
            ThreePointArc((67.5, 0), (0, -67.5), (-67.5, 0))
        make_face()
    extrude(amount=BOSS_EXTRUDE12_DEPTH)

    # Sketch48 → Cut-Extrude15 (cut, two sides: drawn at the far end of the back side and taken through both)
    with BuildSketch(Plane(origin=(0, 0, 0), x_dir=(1, 0, 0), z_dir=(0, 1, 0)).offset(-CUT_EXTRUDE15_DEPTH_BACK)):
        with Locations(Location((-85.865, 6.5, 0), (0, 0, 270))):
            Circle(SKETCH48_R)
        with Locations(Location((-77.865, 6.5, 0), (0, 0, 270))):
            Circle(SKETCH48_R)
        with Locations(Location((77.865, 6.5, 0), (0, 0, 270))):
            Circle(SKETCH48_R)
        with Locations(Location((85.865, 6.5, 0), (0, 0, 270))):
            Circle(SKETCH48_R)
    extrude(amount=CUT_EXTRUDE15_DEPTH + CUT_EXTRUDE15_DEPTH_BACK, mode=Mode.SUBTRACT)

    # Sketch50 → Cut-Extrude16 (cut)
    with BuildSketch(Plane(origin=(0, 0, 0), x_dir=(1, 0, 0), z_dir=(0, 1, 0))):
        with Locations(Location((0, -83, 0), (0, 0, 270))):
            Circle(SKETCH50_R)
    extrude(amount=-CUT_EXTRUDE16_DEPTH, mode=Mode.SUBTRACT)

    # Sketch51 → Cut-Extrude17 (cut, two sides: drawn at the far end of the back side and taken through both)
    with BuildSketch(Plane(origin=(0, -10, 0), x_dir=(1, 0, 0), z_dir=(0, 1, 0)).offset(-CUT_EXTRUDE17_DEPTH_BACK)):
        with Locations(Location((0, -83, 0), (0, 0, 270))):
            Circle(SKETCH51_R)
        with Locations(Location((-8, -83, 0), (0, 0, 270))):
            Circle(SKETCH51_R_2)
        with Locations(Location((8, -83, 0), (0, 0, 270))):
            Circle(SKETCH51_R_2)
    extrude(amount=CUT_EXTRUDE17_DEPTH + CUT_EXTRUDE17_DEPTH_BACK, mode=Mode.SUBTRACT)

    # Sketch52 → Cut-Extrude18 (cut)
    with BuildSketch(Plane.XZ.offset(20)):
        with Locations(Location((0, 83, 0), (0, 0, 270))):
            Circle(SKETCH52_R)
    extrude(amount=-CUT_EXTRUDE18_DEPTH, mode=Mode.SUBTRACT)

    # Sketch53 → Cut-Extrude19 (cut)
    with BuildSketch(Plane.XZ.offset(20)):
        with BuildLine():
            ThreePointArc((12.8, 83), (0, 70.2), (-12.8, 83))
            Line((-12.8, 83), (-36.25, 0))
            Line((-36.25, 0), (0, 0))
            Line((0, 0), (36.25, 0))
            Line((36.25, 0), (12.8, 83))
        make_face()
    extrude(amount=-CUT_EXTRUDE19_DEPTH, mode=Mode.SUBTRACT)

    # Sketch54 → Cut-Extrude20 (cut)
    with BuildSketch(Plane.XZ.offset(20)):
        Polygon((-85.865, -9.964101615), (-82.865, -8.232050808), (-82.865, -4.767949192), (-85.865, -3.035898385), (-88.865, -4.767949192), (-88.865, -8.232050808), align=None)
        Polygon((-77.865, -9.964101615), (-74.865, -8.232050808), (-74.865, -4.767949192), (-77.865, -3.035898385), (-80.865, -4.767949192), (-80.865, -8.232050808), align=None)
        Polygon((77.865, -9.964101615), (80.865, -8.232050808), (80.865, -4.767949192), (77.865, -3.035898385), (74.865, -4.767949192), (74.865, -8.232050808), align=None)
        Polygon((85.865, -9.964101615), (88.865, -8.232050808), (88.865, -4.767949192), (85.865, -3.035898385), (82.865, -4.767949192), (82.865, -8.232050808), align=None)
    extrude(amount=-CUT_EXTRUDE20_DEPTH, mode=Mode.SUBTRACT)


solid = part.part
